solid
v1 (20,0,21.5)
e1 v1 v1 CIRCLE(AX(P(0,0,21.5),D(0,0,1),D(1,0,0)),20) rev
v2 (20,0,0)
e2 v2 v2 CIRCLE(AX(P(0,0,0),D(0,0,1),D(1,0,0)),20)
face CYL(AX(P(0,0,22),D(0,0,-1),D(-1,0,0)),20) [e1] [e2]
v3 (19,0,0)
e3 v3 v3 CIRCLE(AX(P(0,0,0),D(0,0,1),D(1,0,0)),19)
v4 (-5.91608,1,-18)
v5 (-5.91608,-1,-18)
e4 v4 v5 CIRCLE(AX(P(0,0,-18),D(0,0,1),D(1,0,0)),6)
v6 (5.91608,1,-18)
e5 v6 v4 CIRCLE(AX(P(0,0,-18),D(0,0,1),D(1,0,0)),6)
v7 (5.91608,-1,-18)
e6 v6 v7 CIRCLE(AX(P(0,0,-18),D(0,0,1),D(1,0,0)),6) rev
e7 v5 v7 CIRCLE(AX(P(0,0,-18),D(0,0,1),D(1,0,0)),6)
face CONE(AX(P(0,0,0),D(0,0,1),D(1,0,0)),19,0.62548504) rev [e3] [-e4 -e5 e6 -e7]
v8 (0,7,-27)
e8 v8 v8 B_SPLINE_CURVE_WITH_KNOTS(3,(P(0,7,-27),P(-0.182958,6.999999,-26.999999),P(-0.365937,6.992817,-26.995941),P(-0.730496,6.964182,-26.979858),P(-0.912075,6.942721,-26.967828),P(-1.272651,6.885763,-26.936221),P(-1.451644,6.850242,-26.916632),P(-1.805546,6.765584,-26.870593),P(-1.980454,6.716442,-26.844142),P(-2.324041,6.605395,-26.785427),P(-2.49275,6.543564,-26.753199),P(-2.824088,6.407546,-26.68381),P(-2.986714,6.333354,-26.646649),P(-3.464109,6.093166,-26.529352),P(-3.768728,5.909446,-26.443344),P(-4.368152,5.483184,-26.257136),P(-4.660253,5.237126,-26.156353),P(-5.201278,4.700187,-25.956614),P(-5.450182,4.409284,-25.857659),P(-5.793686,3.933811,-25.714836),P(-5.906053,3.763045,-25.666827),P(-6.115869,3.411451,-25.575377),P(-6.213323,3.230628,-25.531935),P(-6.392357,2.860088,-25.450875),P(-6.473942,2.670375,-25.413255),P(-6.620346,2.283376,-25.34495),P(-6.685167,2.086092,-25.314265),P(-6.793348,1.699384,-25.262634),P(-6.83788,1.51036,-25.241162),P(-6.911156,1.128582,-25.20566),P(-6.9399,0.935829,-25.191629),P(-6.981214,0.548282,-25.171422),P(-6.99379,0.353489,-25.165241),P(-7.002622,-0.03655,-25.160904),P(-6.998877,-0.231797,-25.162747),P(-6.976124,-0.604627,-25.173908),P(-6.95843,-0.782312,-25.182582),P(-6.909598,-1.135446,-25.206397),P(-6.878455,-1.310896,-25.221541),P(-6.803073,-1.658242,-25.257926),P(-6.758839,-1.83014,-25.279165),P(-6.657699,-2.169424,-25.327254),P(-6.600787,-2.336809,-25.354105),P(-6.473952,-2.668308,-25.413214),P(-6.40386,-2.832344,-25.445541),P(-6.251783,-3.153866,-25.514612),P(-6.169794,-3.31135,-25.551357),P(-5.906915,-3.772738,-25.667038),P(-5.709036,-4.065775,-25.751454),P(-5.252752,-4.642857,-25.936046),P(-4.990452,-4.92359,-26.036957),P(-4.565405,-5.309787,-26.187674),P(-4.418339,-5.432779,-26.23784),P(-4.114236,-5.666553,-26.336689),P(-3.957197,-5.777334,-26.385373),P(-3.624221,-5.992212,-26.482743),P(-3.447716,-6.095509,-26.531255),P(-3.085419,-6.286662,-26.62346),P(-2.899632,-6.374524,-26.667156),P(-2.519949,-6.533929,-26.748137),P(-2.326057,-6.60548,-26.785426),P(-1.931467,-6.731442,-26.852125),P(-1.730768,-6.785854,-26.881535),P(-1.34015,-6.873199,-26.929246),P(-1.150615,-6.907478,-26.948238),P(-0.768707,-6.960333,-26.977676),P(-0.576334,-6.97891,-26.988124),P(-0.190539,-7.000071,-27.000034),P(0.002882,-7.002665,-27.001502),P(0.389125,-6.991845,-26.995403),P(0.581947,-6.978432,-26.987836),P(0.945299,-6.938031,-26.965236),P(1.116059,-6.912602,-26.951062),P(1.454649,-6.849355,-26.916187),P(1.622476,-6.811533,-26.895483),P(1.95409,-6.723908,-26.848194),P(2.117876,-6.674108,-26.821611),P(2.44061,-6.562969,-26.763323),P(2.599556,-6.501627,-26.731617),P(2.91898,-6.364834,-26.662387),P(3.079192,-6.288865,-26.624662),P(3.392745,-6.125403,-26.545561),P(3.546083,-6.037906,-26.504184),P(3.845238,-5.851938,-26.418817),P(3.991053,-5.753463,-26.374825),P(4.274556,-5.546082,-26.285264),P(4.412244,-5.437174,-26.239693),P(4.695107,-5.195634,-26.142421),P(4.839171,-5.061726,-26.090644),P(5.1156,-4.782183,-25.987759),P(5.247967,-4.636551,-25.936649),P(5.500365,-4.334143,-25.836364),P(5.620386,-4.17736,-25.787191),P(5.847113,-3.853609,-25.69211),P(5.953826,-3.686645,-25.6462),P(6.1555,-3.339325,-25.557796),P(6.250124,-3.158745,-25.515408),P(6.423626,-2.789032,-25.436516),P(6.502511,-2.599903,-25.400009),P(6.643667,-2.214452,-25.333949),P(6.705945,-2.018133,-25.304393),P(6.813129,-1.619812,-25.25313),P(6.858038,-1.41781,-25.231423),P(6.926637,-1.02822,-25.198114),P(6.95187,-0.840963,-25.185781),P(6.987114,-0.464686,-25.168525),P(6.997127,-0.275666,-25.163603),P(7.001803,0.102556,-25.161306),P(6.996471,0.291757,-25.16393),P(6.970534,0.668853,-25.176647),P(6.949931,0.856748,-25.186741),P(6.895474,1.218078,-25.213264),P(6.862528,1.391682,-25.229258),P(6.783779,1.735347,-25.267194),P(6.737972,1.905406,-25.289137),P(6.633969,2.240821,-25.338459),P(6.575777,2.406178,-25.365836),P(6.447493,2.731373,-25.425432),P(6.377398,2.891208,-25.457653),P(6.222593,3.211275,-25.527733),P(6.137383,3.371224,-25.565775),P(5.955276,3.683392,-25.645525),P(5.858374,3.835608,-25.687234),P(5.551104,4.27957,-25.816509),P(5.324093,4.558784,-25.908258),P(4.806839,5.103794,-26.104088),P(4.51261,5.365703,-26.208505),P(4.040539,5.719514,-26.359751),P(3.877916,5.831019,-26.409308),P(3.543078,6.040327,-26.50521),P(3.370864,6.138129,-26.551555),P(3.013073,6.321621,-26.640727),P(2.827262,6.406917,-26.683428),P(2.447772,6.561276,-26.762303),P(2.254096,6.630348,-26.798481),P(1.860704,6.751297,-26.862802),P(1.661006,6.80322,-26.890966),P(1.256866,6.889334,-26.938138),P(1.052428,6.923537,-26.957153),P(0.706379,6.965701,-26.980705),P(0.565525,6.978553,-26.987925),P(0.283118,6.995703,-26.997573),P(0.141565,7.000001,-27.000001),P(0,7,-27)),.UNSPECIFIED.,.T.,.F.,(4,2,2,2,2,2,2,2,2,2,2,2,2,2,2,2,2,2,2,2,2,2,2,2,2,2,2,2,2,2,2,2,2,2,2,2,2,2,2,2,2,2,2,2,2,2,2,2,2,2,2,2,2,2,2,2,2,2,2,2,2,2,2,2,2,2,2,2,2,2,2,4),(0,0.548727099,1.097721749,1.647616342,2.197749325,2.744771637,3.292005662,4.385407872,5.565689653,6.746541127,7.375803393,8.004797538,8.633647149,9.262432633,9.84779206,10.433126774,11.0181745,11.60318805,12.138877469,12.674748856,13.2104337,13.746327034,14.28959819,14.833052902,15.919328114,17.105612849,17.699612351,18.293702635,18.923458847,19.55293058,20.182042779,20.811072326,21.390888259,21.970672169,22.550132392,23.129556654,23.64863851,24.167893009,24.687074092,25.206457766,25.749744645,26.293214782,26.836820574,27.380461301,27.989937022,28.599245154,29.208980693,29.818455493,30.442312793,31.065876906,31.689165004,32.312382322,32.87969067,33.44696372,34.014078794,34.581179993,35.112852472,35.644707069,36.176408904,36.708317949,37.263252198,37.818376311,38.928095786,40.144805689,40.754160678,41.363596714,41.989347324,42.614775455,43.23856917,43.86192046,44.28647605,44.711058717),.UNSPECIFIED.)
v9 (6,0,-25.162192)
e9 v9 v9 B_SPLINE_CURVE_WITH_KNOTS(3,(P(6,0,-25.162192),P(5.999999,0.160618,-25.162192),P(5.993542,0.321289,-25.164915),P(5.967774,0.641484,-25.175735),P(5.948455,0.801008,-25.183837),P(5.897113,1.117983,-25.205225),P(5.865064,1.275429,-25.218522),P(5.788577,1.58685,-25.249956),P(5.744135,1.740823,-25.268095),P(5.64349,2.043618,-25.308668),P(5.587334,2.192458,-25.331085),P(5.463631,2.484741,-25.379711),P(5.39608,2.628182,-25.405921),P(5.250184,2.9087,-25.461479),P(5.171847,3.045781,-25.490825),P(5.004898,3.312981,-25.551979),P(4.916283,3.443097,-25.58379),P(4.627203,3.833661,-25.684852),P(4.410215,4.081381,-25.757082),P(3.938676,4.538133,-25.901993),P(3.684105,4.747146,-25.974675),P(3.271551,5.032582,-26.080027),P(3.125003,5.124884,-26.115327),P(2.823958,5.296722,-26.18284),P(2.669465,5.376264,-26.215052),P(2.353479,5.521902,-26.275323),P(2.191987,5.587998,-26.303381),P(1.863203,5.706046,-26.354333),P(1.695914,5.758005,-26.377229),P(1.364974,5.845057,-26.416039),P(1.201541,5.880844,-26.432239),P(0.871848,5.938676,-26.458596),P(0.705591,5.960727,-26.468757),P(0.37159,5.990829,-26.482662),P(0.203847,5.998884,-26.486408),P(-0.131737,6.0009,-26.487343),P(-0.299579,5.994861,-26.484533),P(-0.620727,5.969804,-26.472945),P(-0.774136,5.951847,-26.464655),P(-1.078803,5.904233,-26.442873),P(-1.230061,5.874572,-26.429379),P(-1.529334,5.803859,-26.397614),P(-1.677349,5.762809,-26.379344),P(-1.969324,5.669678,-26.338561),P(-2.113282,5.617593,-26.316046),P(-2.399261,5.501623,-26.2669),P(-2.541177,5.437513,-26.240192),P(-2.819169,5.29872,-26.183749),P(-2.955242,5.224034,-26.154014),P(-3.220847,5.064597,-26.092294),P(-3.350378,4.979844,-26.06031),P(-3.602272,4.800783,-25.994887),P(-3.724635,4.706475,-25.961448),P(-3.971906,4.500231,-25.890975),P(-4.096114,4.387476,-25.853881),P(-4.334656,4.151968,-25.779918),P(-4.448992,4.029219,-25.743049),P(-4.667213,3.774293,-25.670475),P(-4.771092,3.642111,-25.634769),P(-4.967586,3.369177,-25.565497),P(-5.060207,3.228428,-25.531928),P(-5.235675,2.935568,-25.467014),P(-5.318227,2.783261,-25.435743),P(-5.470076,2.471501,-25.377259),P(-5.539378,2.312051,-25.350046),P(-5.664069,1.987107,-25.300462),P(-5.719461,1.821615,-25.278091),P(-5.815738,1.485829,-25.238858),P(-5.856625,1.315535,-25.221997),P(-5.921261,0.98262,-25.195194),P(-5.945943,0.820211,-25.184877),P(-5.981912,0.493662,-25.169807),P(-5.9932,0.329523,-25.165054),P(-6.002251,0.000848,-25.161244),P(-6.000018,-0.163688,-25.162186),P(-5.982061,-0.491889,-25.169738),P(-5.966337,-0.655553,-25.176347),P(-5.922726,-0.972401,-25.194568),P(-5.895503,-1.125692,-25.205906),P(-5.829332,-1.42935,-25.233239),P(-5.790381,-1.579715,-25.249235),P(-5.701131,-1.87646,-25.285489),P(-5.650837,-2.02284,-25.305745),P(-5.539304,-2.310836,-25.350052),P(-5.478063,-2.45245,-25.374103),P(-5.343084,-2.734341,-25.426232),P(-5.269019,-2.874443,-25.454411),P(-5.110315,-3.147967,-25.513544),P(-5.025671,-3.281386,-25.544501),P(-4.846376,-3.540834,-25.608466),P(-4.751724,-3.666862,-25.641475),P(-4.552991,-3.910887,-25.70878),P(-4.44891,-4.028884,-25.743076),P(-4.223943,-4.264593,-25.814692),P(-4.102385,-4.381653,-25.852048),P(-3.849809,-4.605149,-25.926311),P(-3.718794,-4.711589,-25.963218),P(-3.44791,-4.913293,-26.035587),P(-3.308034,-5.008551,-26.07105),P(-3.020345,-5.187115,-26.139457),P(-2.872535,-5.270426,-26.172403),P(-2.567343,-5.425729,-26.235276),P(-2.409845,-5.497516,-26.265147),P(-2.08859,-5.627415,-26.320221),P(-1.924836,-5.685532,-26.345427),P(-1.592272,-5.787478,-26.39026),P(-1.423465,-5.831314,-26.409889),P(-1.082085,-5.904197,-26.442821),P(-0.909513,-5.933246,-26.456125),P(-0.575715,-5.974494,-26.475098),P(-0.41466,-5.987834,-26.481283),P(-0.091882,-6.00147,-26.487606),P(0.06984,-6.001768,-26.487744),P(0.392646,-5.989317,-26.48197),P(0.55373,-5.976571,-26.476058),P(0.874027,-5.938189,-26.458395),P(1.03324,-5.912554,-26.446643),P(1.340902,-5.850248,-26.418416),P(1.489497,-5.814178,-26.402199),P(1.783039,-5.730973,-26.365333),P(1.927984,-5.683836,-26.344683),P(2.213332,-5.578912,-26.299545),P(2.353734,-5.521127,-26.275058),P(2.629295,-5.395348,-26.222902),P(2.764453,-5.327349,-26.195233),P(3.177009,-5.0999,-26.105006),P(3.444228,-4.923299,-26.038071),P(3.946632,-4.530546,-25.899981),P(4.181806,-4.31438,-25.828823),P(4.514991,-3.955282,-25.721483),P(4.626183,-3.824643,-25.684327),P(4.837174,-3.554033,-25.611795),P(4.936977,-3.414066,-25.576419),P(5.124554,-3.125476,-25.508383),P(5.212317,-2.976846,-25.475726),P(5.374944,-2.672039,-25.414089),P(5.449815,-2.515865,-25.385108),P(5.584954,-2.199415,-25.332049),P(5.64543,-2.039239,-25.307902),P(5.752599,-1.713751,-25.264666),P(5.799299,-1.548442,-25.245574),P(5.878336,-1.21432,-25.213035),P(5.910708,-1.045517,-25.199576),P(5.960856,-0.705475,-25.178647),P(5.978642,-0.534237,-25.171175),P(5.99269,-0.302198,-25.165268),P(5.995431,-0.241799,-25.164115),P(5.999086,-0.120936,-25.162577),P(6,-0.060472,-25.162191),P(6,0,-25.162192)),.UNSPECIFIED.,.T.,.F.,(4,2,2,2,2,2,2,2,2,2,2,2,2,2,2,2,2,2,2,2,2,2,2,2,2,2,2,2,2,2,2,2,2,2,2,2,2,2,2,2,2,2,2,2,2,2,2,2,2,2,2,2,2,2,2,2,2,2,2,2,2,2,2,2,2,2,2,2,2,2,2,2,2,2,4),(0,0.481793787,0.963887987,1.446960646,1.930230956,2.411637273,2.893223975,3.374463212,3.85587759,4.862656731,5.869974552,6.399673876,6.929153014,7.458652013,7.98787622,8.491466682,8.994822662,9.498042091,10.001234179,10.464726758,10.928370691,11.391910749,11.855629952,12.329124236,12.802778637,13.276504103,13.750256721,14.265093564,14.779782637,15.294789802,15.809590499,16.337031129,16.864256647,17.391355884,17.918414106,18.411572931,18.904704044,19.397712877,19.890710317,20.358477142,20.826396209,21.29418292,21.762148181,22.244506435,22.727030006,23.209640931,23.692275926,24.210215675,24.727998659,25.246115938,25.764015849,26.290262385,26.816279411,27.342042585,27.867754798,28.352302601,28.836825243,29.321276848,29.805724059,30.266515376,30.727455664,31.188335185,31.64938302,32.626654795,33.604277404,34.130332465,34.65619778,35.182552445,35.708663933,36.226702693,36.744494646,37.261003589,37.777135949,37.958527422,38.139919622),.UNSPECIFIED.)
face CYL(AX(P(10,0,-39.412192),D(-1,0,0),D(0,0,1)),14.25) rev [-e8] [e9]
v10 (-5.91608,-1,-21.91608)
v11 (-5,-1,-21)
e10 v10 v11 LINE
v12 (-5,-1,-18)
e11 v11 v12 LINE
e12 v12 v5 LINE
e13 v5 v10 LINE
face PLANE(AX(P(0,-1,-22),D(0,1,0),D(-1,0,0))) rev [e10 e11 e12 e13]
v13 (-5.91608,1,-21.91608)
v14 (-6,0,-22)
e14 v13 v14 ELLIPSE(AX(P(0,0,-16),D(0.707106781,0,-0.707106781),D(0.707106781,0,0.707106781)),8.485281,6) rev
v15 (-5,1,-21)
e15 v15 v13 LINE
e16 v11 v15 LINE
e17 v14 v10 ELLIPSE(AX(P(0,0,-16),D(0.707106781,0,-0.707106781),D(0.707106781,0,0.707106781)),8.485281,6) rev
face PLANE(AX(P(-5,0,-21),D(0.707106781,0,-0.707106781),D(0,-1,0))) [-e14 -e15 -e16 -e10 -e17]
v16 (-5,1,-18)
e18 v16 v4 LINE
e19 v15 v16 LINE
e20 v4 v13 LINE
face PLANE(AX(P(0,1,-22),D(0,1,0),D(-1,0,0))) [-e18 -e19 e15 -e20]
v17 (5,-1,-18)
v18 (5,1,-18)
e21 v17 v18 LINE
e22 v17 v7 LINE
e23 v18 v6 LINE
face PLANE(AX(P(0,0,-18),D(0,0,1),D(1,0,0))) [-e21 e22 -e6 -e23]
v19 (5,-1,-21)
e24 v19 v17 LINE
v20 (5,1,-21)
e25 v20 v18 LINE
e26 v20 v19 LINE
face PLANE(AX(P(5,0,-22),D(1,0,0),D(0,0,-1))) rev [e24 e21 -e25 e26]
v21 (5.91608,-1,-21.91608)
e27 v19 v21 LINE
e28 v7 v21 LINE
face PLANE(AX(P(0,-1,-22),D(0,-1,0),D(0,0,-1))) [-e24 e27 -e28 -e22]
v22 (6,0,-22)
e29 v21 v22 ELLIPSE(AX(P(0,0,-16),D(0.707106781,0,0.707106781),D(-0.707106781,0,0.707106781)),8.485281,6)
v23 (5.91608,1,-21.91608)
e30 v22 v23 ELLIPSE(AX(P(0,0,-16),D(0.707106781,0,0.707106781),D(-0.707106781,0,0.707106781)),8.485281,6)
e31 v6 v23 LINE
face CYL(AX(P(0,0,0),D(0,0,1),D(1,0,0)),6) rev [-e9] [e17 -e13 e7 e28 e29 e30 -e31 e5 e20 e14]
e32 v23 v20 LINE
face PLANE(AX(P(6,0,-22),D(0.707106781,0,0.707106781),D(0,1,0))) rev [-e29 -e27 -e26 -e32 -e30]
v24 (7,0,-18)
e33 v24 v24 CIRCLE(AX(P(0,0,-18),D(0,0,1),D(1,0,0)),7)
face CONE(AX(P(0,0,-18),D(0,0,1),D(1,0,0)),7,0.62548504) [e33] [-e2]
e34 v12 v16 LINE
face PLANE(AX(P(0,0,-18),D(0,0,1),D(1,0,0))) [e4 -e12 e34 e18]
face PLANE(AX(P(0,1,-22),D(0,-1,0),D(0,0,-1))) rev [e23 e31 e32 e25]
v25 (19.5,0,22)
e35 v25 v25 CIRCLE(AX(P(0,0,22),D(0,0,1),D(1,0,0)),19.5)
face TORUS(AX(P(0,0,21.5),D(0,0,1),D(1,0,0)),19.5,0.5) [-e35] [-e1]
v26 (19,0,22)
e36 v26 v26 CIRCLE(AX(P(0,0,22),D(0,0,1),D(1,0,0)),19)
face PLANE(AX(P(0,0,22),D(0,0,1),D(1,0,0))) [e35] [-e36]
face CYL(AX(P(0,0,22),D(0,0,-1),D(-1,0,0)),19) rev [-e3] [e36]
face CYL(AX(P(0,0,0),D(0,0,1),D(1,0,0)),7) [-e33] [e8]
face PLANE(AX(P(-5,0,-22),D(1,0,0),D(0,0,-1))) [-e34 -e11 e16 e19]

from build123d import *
from build123d.topology import SkipClean

# Parameters (mm, degrees)
SKETCH1_R               = 20
SKETCH1_R_2             = 19
BOSS_EXTRUDE1_DEPTH     = 22
FILLET1_R               = 0.5
SKETCH5_W               = 9
SKETCH5_H               = 1
CUT_EXTRUDE1_DEPTH      = 10
CUT_EXTRUDE1_DEPTH_BACK = 10
SKETCH6_R               = 14.25
BOSS_EXTRUDE2_START     = -44
BOSS_EXTRUDE2_DEPTH     = 4
CHAMFER1_SIZE           = 1


with BuildPart() as part:
    # Sketch1 → Boss-Extrude1 (new body)
    with BuildSketch(Plane.XY):
        Circle(SKETCH1_R)
        Circle(SKETCH1_R_2, mode=Mode.SUBTRACT)
    extrude(amount=BOSS_EXTRUDE1_DEPTH)

    # Fillet1
    fillet1_edges = [part.edges().sort_by_distance(p)[0] for p in [
        (-20, 0, 22),
    ]]
    fillet(fillet1_edges, radius=FILLET1_R)

    # Sketch5 → Revolve1 (revolve)
    with BuildSketch(Plane(origin=(0, 0, 0), x_dir=(0, 0, -1), z_dir=(1, 0, 0)), mode=Mode.PRIVATE) as revolve1_sk:
        Polygon((0, 19), (18, 6), (18, 7), (0, 20), align=None)
        with Locations((22.5, 6.5)):
            Rectangle(SKETCH5_W, SKETCH5_H)
    revolve(revolve1_sk.sketch.rotate(Axis((0, 0, 0), (0, 0, -1)), 90), axis=Axis((0, 0, 0), (0, 0, -1)))

    # Sketch6 → Cut-Extrude1 (cut, two sides: drawn at the far end of the back side and taken through both)
    with BuildSketch(Plane(origin=(0, 0, 0), x_dir=(0, 0, -1), z_dir=(1, 0, 0)).offset(-CUT_EXTRUDE1_DEPTH_BACK)):
        with Locations((39.412191587, 0)):
            Circle(SKETCH6_R)
    extrude(amount=CUT_EXTRUDE1_DEPTH + CUT_EXTRUDE1_DEPTH_BACK, mode=Mode.SUBTRACT)

    # Sketch7 → Boss-Extrude2 (add)
    with SkipClean():  # the faces are left unmerged after this step: merging them gives an invalid solid
        with BuildSketch(Plane.XY.offset(22).offset(BOSS_EXTRUDE2_START)):
            with BuildLine():
                Line((-6.92820323, -1), (-5, -1))
                Line((-5, -1), (-5, 1))
                Line((-5, 1), (-6.92820323, 1))
                ThreePointArc((-6.92820323, 1), (-6.982027736, 0.501287038), (-7, 0))
                ThreePointArc((-7, 0), (-6.982027736, -0.501287038), (-6.92820323, -1))
            make_face()
            with BuildLine():
                Line((5, -1), (6.92820323, -1))
                ThreePointArc((6.92820323, -1), (6.982027736, -0.501287038), (7, 0))
                ThreePointArc((7, 0), (6.982027736, 0.501287038), (6.92820323, 1))
                Line((6.92820323, 1), (5, 1))
                Line((5, 1), (5, -1))
            make_face()
        extrude(amount=BOSS_EXTRUDE2_DEPTH)

    # Chamfer1
    chamfer1_edges = [part.edges().sort_by_distance(p)[0] for p in [
        (-5, 0, -22),
        (5, 0, -22),
    ]]
    chamfer(chamfer1_edges, length=CHAMFER1_SIZE - 0.0001)  # a hair under: the kernel refuses the full size


solid = part.part
